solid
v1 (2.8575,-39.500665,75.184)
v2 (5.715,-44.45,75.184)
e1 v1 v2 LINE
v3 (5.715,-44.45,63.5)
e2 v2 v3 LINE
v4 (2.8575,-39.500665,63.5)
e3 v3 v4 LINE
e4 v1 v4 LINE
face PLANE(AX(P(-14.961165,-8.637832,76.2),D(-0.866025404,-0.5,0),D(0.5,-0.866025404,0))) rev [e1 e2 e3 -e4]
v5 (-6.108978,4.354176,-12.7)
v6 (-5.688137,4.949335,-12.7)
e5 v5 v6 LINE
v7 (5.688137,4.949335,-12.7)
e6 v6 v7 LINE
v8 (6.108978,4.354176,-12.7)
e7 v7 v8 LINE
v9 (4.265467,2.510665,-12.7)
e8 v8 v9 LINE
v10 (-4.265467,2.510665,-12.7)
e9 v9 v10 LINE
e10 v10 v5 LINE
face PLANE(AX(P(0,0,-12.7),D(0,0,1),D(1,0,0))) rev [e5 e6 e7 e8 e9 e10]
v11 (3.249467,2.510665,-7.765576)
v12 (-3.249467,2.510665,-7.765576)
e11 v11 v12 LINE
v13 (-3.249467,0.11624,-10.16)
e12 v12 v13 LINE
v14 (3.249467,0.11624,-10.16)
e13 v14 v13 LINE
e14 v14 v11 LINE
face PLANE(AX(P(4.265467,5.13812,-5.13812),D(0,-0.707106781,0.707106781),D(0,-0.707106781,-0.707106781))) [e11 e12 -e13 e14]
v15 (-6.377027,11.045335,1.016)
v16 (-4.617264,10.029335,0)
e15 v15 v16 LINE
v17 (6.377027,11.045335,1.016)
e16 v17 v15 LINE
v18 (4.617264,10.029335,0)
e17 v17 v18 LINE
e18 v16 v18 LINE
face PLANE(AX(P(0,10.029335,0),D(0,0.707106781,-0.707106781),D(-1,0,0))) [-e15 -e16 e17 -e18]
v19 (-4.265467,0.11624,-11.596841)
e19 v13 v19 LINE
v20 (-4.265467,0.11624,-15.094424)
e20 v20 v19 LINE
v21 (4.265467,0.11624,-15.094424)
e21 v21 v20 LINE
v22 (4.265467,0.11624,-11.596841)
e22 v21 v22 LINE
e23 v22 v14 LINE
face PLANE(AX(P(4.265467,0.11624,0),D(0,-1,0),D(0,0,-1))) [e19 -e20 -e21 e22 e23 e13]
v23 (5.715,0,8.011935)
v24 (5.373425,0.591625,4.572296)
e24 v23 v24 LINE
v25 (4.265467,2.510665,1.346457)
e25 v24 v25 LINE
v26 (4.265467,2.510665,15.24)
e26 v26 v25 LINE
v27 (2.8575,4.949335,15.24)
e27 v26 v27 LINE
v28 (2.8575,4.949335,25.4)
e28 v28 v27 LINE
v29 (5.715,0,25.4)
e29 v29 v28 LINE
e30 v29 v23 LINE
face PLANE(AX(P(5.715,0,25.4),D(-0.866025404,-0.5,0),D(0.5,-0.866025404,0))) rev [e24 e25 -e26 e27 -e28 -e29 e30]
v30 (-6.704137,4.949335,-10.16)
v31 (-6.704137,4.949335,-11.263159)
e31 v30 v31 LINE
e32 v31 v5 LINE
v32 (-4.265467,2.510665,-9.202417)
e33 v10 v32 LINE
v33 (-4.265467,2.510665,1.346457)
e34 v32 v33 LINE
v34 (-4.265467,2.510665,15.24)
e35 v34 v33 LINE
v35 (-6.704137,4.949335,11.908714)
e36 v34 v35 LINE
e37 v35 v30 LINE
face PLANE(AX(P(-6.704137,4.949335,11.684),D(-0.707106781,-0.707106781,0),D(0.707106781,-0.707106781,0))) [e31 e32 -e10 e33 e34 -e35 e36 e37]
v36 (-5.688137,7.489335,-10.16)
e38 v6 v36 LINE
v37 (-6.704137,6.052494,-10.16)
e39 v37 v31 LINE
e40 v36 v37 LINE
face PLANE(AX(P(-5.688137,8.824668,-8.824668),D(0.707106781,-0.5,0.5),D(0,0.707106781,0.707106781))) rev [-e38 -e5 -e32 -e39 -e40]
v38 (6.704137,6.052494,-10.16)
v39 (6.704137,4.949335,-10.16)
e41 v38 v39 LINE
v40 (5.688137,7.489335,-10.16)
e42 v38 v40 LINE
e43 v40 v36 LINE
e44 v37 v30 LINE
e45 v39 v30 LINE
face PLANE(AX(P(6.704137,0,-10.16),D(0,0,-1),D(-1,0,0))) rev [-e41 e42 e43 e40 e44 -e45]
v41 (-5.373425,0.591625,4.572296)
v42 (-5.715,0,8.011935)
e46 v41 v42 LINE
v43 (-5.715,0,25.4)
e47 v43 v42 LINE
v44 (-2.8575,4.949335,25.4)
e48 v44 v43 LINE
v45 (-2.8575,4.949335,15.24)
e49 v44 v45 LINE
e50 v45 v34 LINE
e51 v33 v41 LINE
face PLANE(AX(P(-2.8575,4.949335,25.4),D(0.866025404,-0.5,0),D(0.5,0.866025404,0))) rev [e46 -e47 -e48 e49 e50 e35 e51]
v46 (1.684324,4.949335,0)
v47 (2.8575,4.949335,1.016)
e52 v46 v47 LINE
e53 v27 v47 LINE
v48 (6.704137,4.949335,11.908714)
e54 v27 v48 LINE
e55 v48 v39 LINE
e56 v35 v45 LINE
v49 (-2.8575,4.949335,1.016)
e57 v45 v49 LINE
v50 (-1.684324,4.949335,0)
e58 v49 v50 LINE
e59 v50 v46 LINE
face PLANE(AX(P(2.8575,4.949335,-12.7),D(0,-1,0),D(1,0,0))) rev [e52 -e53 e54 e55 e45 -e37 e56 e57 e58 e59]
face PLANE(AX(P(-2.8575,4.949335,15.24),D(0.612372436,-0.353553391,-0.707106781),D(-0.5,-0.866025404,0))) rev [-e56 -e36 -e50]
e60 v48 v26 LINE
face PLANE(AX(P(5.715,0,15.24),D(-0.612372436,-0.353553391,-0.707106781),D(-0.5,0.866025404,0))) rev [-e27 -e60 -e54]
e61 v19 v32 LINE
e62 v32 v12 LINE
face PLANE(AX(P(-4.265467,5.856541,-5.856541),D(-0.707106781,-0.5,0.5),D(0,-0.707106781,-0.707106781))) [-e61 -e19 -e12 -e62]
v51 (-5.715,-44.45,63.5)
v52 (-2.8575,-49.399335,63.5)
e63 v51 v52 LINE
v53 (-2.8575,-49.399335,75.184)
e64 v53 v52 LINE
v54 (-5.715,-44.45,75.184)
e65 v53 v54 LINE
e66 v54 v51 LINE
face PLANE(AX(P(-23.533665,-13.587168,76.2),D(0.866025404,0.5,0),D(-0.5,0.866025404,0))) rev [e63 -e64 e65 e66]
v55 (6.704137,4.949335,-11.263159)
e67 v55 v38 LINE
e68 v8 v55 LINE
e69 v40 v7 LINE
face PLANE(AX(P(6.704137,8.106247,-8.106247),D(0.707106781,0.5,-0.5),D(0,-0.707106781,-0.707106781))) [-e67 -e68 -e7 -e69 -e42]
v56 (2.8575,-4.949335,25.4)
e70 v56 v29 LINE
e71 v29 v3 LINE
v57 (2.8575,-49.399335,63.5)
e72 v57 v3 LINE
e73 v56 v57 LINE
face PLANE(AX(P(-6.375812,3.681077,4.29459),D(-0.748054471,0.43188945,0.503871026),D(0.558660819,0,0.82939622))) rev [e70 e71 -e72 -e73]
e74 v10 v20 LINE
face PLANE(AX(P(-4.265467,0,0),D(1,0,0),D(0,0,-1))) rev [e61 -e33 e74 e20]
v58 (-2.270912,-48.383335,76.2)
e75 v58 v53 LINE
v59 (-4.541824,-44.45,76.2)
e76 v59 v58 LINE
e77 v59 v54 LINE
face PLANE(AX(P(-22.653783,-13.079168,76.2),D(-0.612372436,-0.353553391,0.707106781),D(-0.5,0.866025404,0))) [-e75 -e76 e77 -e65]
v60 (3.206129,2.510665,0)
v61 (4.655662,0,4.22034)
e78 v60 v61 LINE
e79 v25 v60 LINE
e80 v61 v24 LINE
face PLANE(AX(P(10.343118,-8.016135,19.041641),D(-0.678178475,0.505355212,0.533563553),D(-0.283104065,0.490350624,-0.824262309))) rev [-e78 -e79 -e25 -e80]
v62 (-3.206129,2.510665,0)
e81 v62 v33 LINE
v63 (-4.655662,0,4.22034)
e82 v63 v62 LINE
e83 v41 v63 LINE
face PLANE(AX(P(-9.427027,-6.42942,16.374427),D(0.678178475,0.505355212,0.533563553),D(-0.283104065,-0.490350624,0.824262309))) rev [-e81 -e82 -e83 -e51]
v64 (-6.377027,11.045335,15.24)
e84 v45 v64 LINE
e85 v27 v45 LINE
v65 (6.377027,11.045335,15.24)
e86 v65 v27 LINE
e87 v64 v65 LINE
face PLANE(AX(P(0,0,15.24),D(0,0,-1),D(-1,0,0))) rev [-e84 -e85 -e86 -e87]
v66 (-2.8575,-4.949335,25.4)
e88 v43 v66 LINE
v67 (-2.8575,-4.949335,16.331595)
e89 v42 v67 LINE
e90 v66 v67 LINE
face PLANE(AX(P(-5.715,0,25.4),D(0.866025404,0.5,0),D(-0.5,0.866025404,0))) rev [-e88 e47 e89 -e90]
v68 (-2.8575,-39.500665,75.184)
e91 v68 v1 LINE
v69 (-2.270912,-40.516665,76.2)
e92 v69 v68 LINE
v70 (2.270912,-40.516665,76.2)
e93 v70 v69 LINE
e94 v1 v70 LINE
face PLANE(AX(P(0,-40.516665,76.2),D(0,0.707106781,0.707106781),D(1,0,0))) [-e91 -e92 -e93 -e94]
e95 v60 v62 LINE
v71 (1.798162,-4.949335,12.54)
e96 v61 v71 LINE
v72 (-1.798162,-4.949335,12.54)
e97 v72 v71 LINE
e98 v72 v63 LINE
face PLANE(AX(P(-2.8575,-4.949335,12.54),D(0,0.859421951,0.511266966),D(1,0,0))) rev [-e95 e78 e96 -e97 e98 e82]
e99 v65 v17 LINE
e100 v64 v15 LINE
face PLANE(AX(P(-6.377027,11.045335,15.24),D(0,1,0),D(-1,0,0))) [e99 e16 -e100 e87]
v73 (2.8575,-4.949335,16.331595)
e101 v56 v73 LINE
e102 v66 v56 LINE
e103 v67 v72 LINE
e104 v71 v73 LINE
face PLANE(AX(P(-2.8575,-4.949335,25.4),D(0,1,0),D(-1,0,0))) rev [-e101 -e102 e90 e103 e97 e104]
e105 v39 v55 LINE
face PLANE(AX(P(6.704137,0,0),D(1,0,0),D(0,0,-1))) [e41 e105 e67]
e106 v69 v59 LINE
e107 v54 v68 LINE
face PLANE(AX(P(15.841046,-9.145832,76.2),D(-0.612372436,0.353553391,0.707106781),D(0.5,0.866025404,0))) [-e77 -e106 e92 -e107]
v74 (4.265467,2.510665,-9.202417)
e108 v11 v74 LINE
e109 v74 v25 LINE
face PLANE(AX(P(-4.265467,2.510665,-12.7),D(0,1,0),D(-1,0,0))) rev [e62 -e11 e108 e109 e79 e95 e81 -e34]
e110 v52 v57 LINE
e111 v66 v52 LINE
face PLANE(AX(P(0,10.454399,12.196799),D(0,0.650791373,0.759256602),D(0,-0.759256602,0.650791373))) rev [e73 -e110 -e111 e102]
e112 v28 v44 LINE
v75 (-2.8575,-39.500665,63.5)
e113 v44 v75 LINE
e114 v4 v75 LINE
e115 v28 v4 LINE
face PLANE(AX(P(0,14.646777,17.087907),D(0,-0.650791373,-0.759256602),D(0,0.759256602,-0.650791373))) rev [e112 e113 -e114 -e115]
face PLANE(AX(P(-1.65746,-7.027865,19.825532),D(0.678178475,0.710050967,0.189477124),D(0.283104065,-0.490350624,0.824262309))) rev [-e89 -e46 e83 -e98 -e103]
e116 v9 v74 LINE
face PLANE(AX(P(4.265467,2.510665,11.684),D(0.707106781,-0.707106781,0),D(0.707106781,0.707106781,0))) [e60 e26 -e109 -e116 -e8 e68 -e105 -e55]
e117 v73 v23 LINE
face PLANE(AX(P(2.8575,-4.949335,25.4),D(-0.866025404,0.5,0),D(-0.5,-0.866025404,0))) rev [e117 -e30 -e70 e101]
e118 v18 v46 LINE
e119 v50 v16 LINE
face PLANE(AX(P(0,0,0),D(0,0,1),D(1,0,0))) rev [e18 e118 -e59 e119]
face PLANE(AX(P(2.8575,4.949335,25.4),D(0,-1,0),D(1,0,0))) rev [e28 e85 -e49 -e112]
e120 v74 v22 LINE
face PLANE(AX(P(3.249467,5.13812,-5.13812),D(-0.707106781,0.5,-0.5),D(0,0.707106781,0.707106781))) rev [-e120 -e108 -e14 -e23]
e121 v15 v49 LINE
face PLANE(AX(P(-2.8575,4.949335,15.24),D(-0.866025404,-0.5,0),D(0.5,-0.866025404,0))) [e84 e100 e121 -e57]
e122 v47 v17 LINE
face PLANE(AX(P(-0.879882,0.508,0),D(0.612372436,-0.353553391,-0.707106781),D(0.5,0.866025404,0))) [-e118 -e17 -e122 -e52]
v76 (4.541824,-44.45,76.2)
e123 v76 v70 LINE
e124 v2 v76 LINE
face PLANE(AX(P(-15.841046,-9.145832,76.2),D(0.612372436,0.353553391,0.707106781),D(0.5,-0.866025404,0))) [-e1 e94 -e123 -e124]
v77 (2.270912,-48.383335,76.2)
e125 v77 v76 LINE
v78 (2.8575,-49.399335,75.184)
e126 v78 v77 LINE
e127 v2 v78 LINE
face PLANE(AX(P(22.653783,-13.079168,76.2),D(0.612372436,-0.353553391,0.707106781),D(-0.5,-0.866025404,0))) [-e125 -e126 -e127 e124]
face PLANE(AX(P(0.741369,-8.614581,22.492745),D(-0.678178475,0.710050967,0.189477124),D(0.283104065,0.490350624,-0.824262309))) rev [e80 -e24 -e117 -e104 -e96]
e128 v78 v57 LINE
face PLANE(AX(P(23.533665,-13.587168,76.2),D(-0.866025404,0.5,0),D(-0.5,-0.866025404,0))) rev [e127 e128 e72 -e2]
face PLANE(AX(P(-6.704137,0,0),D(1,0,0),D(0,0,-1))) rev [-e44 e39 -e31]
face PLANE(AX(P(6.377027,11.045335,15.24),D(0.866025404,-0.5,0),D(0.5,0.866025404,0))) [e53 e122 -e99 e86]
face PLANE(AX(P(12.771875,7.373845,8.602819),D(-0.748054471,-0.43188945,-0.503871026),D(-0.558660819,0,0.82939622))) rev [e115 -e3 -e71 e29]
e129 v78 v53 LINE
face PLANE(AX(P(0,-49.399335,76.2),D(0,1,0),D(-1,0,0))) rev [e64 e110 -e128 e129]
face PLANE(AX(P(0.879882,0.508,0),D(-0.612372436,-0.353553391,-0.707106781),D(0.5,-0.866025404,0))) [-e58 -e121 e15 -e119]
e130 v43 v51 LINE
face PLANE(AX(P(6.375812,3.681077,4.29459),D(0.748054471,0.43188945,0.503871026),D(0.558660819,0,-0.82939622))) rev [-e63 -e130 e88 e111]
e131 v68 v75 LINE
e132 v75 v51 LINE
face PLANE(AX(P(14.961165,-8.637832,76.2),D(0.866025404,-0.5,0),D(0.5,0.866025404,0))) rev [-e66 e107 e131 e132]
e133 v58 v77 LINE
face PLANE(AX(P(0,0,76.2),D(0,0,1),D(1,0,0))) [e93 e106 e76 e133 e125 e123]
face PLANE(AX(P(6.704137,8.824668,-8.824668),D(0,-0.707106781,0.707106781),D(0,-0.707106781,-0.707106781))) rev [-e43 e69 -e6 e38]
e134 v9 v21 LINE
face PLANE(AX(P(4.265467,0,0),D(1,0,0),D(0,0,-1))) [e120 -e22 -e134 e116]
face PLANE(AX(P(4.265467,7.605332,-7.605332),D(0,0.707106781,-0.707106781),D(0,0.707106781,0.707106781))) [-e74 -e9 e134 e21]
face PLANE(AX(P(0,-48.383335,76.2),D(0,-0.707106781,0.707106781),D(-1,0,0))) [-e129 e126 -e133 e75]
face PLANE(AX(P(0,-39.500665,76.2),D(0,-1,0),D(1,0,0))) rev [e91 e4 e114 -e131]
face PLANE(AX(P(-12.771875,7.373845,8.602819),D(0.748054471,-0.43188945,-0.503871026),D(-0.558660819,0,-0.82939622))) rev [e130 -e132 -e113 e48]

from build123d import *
from OCP.BRepFilletAPI import BRepFilletAPI_MakeChamfer

# Parameters (mm, degrees)
BOSS_EXTRUDE1_DEPTH      = 25.4
BOSS_EXTRUDE2_DEPTH      = 12.7
BOSS_EXTRUDE3_DEPTH      = 15.239999999999998
CHAMFER1_SIZE            = 7.46
CHAMFER1_SIZE2           = 12.540000000000001
BOSS_EXTRUDE4_DEPTH      = 12.7
BOSS_EXTRUDE5_DEPTH      = 24.384
BOSS_EXTRUDE6_DEPTH      = 4.265467
BOSS_EXTRUDE6_DEPTH_BACK = 4.265467
BOSS_EXTRUDE7_DEPTH      = 6.704137
BOSS_EXTRUDE7_DEPTH_BACK = 6.704137
CHAMFER2_SIZE            = 3.556
CHAMFER3_SIZE            = 1.016
CHAMFER3_SIZE2           = 2.1468318359684853
CHAMFER3_SIZE2_2         = 0.7623750143993072


with BuildPart() as part:
    # Sketch1 → Boss-Extrude1 (new body)
    with BuildSketch(Plane.XY):
        Polygon((5.715, 0), (2.8574999999999884, 4.949335182628073), (-2.857500000000022, 4.949335182628053), (-5.715, -3.991e-14), (-2.8574999999999533, -4.949335182628093), (2.8575000000000577, -4.949335182628033), align=None)
    extrude(amount=BOSS_EXTRUDE1_DEPTH)



with BuildPart() as body_2:
    # Sketch2 → Boss-Extrude2 (new body)
    with BuildSketch(Plane.XY.offset(63.5)):
        Polygon((-2.8574999999999533, -49.399335182628086), (2.8575000000000577, -49.399335182628036), (5.714999999999993, -44.45000000000016), (2.8574999999999884, -39.50066481737193), (-2.857500000000022, -39.50066481737194), (-5.715, -44.45000000000003), align=None)
    extrude(amount=BOSS_EXTRUDE2_DEPTH)


with BuildPart() as part_1:
    add(part.part)

    add(body_2.part)  # loft1 joins it to this body
    # loft from a face of the part (loft1)
    loft([part_1.faces().sort_by_distance((4.1e-15, -1.66e-15, 25.4))[0], part_1.faces().sort_by_distance((2.71e-15, -44.45000000000001, 63.5))[0]])

    # Sketch4 → Boss-Extrude3 (add)
    with BuildSketch(Plane(origin=(0, 0, 0), x_dir=(-1, 0, 0), z_dir=(0, 0, -1))):
        Polygon((2.857500000000022, 4.949335182628053), (6.3770272409799595, 11.045335182628051), (-6.377027240979914, 11.04533518262805), (-2.8574999999999884, 4.949335182628073), align=None)
    extrude(amount=-BOSS_EXTRUDE3_DEPTH)

    # Chamfer1
    chamfer1_edges = [part_1.edges().sort_by_distance(p)[0] for p in [
        (5.196e-14, -4.949335182628063, 0),
    ]]
    chamfer1_side = [part_1.faces().sort_by_distance(p)[0] for p in [
        (-7.04e-15, 3.3439435440816787, 0),
    ]]
    chamfer(chamfer1_edges, length=CHAMFER1_SIZE, length2=CHAMFER1_SIZE2, reference=chamfer1_side[0])

    # Sketch5 → Boss-Extrude4 (add)
    with BuildSketch(Plane(origin=(0, 0, 0), x_dir=(-1, 0, 0), z_dir=(0, 0, -1))):
        Polygon((-2.8574999999999884, 4.949335182628073), (2.857500000000022, 4.949335182628053), (4.265466991845397, 2.510664817371916), (-4.265466991845346, 2.5106648173720054), align=None)
    extrude(amount=BOSS_EXTRUDE4_DEPTH)

    # Sketch6 → Boss-Extrude5 (add)
    with BuildSketch(Plane(origin=(0, 0, -12.7), x_dir=(-1, 0, 0), z_dir=(0, 0, -1))):
        Polygon((-4.265466991845346, 2.5106648173720054), (-6.7041373571014065, 4.949335182628073), (-2.8574999999999884, 4.949335182628073), (2.857500000000022, 4.949335182628053), (6.7041373571013665, 4.949335182628074), (4.265466991845397, 2.510664817371916), align=None)
    extrude(amount=-BOSS_EXTRUDE5_DEPTH)

    # Sketch7 → Boss-Extrude6 (add, two sides: drawn at the far end of the back side and taken through both)
    with BuildSketch(Plane(origin=(0, 0, 0), x_dir=(0, 0, -1), z_dir=(1, 0, 0)).offset(-BOSS_EXTRUDE6_DEPTH_BACK)):
        Polygon((7.765575597798472, 2.5106648173720054), (10.159999999999973, 2.5106648173720054), (12.7, 2.5106648173720054), (15.094424402201499, 0.11624041517056517), (10.159999999999973, 0.11624041517056455), align=None)
    extrude(amount=BOSS_EXTRUDE6_DEPTH + BOSS_EXTRUDE6_DEPTH_BACK)

    # Sketch7<3> → Boss-Extrude7 (add, two sides: drawn at the far end of the back side and taken through both)
    with BuildSketch(Plane(origin=(0, 0, 0), x_dir=(0, 0, -1), z_dir=(1, 0, 0)).offset(-BOSS_EXTRUDE7_DEPTH_BACK)):
        Polygon((10.159999999999972, 7.489335182628074), (10.159999999999972, 4.949335182628073), (12.7, 4.949335182628073), align=None)
    extrude(amount=BOSS_EXTRUDE7_DEPTH + BOSS_EXTRUDE7_DEPTH_BACK)

    # Chamfer2
    # the kernel refuses this chamfer: 3.556 mm, written as the material it adds along each edge
    with BuildSketch(Plane(origin=(8.837919344448796, -5.409054972524991, 11.684000000000001), x_dir=(-0.023812127644090044, -0.013747938305293153, 0.9996219169112966), z_dir=(-0.500000000000001, 0.866025403784438, 0))) as chamfer2_piece_1_section:
        Polygon((CHAMFER2_SIZE * 0.999621916911, CHAMFER2_SIZE * 0.0274958766106), (-CHAMFER2_SIZE * 0.0274958766106, CHAMFER2_SIZE * 0.999621916911), (0, 0), align=None)
    chamfer2_piece_1 = extrude(amount=21.10574339410437, mode=Mode.PRIVATE)
    chamfer2_piece_1 = split(chamfer2_piece_1, bisect_by=Plane(origin=(5.0850917452486755, 3.330289570775337, 13.032835155075794), z_dir=(-0.7071067811865487, 0.7071067811865465, 0)), keep=Keep.TOP, mode=Mode.PRIVATE)
    chamfer2_piece_1 = split(chamfer2_piece_1, bisect_by=Plane(origin=(4.3712108447170275, 4.9493351826280785, 13.032835155075794), z_dir=(3.57e-15, -1, 0)), keep=Keep.TOP, mode=Mode.PRIVATE)
    add(chamfer2_piece_1)
    with BuildSketch(Plane(origin=(1.7149523526033228, 12.869054972524992, 11.684000000000001), x_dir=(0.023812127644090457, -0.013747938305293174, 0.9996219169112966), z_dir=(-0.4999999999999951, -0.8660254037844415, 0))) as chamfer2_piece_2_section:
        Polygon((CHAMFER2_SIZE * 0.999621916911, CHAMFER2_SIZE * 0.0274958766106), (-CHAMFER2_SIZE * 0.0274958766106, CHAMFER2_SIZE * 0.999621916911), (0, 0), align=None)
    chamfer2_piece_2 = extrude(amount=21.10574339410434, mode=Mode.PRIVATE)
    chamfer2_piece_2 = split(chamfer2_piece_2, bisect_by=Plane(origin=(-4.371210844717055, 4.949335182628047, 13.032835155075803), z_dir=(3.57e-15, -1, 0)), keep=Keep.TOP, mode=Mode.PRIVATE)
    chamfer2_piece_2 = split(chamfer2_piece_2, bisect_by=Plane(origin=(-5.085091745248726, 3.330289570775309, 13.032835155075805), z_dir=(0.7071067811865749, 0.7071067811865203, 0)), keep=Keep.TOP, mode=Mode.PRIVATE)
    add(chamfer2_piece_2)

    # Chamfer3: one chamfer whose edges measure the first distance from different faces: ONE call of the kernel's chamfer builder (chamfer() names one face for all edges)
    chamfer3_edges_1 = [part_1.edges().sort_by_distance(p)[0] for p in [
        (-4.265467, 1.3134526162712852, -8.962787798899223),
        (4.265467, 1.3134526162712852, -8.962787798899223),
        (-4.617263620489991, 7.997335182628052, 0),
        (-2.309e-14, 11.045335182628051, 0),
        (4.617263620489951, 7.997335182628062, 0),
        (-6.704137, 6.219335182628074, -11.429999999999986),
        (6.704137, 6.219335182628074, -11.429999999999986),
        (5.196e-14, -49.399335182628064, 76.2),
        (-4.286249999999977, -46.92466759131406, 76.2),
        (4.286250000000026, -46.9246675913141, 76.2),
        (-4.286250000000011, -41.975332408685986, 76.2),
        (4.28624999999999, -41.97533240868604, 76.2),
        (-1.688e-14, -39.500664817371934, 76.2),
    ]]
    chamfer3_edges_2 = [part_1.edges().sort_by_distance(p)[0] for p in [
        (-4.286249999999978, -2.4746675913140663, 8.380170027469429),
        (4.286250000000031, -2.4746675913140157, 8.380170027469497),
    ]]
    chamfer3_side_2 = [part_1.faces().sort_by_distance(p)[0] for p in [
        (1.357e-14, -0.9394076954343201, 5.7994516502132),
    ]]
    chamfer3_edges_3 = [part_1.edges().sort_by_distance(p)[0] for p in [
        (-4.990233495922706, 1.255332408685926, 2.1101700274694246),
        (4.990233495922681, 1.2553324086859914, 2.1101700274694926),
    ]]
    chamfer3_side_3 = [part_1.faces().sort_by_distance(p)[0] for p in [
        (1.357e-14, -0.9394076954343201, 5.7994516502132),
    ]]
    chamfer3 = BRepFilletAPI_MakeChamfer(part_1.part.solid().wrapped)
    for e in chamfer3_edges_1:
        chamfer3.Add(CHAMFER3_SIZE, e.wrapped)
    for e in chamfer3_edges_2:
        chamfer3.Add(CHAMFER3_SIZE, CHAMFER3_SIZE2, e.wrapped, chamfer3_side_2[0].wrapped)  # the first distance lies on this face
    for e in chamfer3_edges_3:
        chamfer3.Add(CHAMFER3_SIZE, CHAMFER3_SIZE2_2, e.wrapped, chamfer3_side_3[0].wrapped)  # the first distance lies on this face
    add(Compound.cast(chamfer3.Shape()), mode=Mode.REPLACE)


solid = part_1.part
